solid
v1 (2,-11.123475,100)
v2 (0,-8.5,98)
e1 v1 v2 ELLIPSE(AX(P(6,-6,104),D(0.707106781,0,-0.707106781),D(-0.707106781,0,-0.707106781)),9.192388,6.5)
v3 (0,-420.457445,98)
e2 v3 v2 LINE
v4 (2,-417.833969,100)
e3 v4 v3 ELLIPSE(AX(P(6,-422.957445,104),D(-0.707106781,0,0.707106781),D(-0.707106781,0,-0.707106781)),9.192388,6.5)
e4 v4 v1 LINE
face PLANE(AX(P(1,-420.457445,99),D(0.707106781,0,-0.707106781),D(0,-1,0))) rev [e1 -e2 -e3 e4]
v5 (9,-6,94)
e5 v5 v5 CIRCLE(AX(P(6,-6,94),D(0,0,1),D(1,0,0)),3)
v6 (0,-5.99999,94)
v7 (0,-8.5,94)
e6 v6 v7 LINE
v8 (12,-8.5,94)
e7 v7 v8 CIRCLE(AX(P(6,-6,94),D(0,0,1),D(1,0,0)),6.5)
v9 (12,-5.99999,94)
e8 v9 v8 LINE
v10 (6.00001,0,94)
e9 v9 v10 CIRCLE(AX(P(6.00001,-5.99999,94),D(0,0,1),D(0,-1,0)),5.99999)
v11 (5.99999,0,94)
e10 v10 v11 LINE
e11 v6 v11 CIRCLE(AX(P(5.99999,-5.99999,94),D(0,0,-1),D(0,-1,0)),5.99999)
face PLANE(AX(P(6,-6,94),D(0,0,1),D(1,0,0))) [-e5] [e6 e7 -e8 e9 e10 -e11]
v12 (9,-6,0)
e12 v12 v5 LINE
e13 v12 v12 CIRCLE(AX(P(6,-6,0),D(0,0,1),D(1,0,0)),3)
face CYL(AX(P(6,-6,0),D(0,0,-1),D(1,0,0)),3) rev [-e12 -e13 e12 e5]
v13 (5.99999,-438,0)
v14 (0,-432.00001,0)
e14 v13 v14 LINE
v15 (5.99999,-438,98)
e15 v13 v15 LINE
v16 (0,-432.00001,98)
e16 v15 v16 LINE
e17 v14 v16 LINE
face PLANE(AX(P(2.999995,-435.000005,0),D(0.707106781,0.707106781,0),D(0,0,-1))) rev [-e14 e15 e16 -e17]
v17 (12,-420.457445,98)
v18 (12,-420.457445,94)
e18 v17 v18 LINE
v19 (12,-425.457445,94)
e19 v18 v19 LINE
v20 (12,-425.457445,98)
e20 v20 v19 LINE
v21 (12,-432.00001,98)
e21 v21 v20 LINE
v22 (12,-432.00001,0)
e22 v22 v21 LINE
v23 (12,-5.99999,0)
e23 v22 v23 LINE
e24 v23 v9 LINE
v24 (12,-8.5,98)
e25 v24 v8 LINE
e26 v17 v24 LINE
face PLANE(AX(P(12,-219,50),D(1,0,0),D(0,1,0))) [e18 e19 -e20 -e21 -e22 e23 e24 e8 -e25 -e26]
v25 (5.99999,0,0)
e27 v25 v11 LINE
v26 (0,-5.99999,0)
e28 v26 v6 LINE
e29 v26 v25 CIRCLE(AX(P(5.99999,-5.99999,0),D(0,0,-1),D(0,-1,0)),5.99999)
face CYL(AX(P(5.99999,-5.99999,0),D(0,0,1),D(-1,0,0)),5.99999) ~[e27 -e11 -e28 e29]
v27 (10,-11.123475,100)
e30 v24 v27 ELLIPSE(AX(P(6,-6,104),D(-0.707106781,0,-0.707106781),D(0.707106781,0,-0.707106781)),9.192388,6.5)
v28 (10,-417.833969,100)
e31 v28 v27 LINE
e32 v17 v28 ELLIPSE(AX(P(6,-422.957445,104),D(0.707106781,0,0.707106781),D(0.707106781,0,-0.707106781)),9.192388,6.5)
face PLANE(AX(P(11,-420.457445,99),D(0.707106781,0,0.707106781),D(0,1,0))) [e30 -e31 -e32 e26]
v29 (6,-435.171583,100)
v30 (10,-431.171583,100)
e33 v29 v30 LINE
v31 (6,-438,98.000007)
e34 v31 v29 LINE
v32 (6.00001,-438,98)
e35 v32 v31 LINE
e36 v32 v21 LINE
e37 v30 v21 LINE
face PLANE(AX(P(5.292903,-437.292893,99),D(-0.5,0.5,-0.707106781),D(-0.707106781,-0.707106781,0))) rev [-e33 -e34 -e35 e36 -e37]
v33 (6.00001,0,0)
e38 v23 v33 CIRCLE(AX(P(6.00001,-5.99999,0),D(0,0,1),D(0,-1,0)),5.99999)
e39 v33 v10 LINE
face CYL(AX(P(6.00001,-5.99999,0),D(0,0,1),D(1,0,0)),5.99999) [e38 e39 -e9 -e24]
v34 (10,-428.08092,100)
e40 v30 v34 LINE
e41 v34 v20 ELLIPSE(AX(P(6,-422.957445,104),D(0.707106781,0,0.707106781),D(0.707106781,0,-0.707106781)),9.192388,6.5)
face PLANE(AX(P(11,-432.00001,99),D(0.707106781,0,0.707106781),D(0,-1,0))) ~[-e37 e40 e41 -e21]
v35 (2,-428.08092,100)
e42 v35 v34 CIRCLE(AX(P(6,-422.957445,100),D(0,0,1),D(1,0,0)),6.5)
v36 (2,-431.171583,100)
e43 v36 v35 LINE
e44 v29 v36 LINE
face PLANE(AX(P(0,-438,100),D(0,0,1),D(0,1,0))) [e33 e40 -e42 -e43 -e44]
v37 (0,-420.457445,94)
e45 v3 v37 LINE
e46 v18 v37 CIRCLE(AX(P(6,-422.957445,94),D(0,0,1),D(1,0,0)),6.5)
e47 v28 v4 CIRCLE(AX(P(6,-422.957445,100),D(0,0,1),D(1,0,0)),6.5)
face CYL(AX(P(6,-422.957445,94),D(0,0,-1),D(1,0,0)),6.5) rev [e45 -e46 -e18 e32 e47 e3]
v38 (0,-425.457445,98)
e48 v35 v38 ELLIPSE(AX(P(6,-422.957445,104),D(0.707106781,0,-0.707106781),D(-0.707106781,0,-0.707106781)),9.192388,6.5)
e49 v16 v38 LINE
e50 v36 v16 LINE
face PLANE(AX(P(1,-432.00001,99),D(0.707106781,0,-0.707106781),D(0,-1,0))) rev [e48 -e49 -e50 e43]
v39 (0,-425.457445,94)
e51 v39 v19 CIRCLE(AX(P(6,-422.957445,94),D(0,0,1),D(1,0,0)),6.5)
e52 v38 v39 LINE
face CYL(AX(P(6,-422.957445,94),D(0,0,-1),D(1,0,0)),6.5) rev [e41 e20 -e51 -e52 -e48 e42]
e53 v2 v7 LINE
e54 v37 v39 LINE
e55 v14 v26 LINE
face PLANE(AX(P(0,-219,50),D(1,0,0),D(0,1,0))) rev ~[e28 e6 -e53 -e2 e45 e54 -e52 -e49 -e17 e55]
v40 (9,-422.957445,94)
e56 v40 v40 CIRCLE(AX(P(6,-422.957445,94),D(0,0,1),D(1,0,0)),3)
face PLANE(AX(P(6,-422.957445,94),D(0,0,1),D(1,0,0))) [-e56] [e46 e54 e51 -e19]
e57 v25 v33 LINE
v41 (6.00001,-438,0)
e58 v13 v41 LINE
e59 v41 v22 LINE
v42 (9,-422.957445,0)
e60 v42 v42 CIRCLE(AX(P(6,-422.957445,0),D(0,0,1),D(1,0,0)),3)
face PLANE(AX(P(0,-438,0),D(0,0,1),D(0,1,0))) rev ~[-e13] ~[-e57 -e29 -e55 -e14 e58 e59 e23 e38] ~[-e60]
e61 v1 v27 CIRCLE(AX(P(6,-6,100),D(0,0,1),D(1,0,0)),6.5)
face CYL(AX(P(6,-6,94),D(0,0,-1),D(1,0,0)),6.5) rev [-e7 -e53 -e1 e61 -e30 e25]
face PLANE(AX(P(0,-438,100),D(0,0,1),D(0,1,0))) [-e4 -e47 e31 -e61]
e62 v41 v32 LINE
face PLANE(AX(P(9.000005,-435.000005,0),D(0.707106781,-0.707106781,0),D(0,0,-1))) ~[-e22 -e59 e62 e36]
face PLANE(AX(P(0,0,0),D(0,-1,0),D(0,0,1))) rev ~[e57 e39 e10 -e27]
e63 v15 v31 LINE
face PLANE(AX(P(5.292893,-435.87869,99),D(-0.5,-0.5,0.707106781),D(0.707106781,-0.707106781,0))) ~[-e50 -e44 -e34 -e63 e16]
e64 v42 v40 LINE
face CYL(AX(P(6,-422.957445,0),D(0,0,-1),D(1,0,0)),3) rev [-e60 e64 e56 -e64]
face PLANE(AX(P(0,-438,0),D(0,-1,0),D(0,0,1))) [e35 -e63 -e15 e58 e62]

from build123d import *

# Parameters (mm, degrees)
F0_W     = 438
F0_H     = 100
F1_DEPTH = 12
F2_R     = 3
F3_DEPTH = 120
F4_START = 94
F2_R_2   = 6.5
F4_DEPTH = 6
F5_SIZE  = 5.99999
F6_SIZE  = 2
F7_R     = 5.99999


# Not quite as in the source:
# - a fillet or chamfer is up to 0.001 mm smaller than in the source, because OpenCascade refuses the exact size


with BuildPart() as f1:
    # F0 (on Right) → F1 (new body)
    with BuildSketch(Plane.YZ):
        with Locations((-219, 50)):
            Rectangle(F0_W, F0_H)
    extrude(amount=F1_DEPTH)

    # F2 (on Top) → F3 (cut)
    with BuildSketch(Plane.XY):
        with Locations((6, -422.9574446679)):
            Circle(F2_R)
        with Locations((6, -6)):
            Circle(F2_R)
    extrude(amount=F3_DEPTH, mode=Mode.SUBTRACT)

    # F2 (on Top) → F4 (cut)
    with BuildSketch(Plane.XY.offset(F4_START)):
        with Locations((6, -6)):
            Circle(F2_R_2)
        with Locations((6, -6)):
            Circle(F2_R, mode=Mode.SUBTRACT)
        with Locations((6, -422.9574446679)):
            Circle(F2_R_2)
        with Locations((6, -422.9574446679)):
            Circle(F2_R, mode=Mode.SUBTRACT)
    extrude(amount=F4_DEPTH, mode=Mode.SUBTRACT)

    # F5 (size 6 in the source; OpenCascade refuses exactly that, so slightly less here)
    f5_edges = [f1.edges().sort_by_distance(p)[0] for p in [
        (12, -438, 50),
        (0, -438, 50),
    ]]
    chamfer(f5_edges, length=F5_SIZE)

    # F6 (call 1 of 4: OpenCascade refuses the feature's edges together)
    f6_edges = [f1.edges().sort_by_distance(p)[0] for p in [
        (12, -428.728727, 100),
        (9.000005, -435.000005, 100),
    ]]
    chamfer(f6_edges, length=F6_SIZE)

    # F6#2 (call 2 of 4)
    f6_2_edges = [f1.edges().sort_by_distance(p)[0] for p in [
        (0, -428.728727, 100),
        (2.999995, -435.000005, 100),
    ]]
    chamfer(f6_2_edges, length=F6_SIZE)

    # F6#3 (call 3 of 4)
    f6_3_edges = [f1.edges().sort_by_distance(p)[0] for p in [
        (12, -214.478722, 100),
    ]]
    chamfer(f6_3_edges, length=F6_SIZE)

    # F6#4 (call 4 of 4)
    f6_4_edges = [f1.edges().sort_by_distance(p)[0] for p in [
        (0, -214.478722, 100),
    ]]
    chamfer(f6_4_edges, length=F6_SIZE)

    # F7 (radius 6 in the source; OpenCascade refuses exactly that, so slightly less here)
    f7_edges = [f1.edges().sort_by_distance(p)[0] for p in [
        (12, 0, 50),
        (0, 0, 50),
    ]]
    fillet(f7_edges, radius=F7_R)


solid = f1.part
